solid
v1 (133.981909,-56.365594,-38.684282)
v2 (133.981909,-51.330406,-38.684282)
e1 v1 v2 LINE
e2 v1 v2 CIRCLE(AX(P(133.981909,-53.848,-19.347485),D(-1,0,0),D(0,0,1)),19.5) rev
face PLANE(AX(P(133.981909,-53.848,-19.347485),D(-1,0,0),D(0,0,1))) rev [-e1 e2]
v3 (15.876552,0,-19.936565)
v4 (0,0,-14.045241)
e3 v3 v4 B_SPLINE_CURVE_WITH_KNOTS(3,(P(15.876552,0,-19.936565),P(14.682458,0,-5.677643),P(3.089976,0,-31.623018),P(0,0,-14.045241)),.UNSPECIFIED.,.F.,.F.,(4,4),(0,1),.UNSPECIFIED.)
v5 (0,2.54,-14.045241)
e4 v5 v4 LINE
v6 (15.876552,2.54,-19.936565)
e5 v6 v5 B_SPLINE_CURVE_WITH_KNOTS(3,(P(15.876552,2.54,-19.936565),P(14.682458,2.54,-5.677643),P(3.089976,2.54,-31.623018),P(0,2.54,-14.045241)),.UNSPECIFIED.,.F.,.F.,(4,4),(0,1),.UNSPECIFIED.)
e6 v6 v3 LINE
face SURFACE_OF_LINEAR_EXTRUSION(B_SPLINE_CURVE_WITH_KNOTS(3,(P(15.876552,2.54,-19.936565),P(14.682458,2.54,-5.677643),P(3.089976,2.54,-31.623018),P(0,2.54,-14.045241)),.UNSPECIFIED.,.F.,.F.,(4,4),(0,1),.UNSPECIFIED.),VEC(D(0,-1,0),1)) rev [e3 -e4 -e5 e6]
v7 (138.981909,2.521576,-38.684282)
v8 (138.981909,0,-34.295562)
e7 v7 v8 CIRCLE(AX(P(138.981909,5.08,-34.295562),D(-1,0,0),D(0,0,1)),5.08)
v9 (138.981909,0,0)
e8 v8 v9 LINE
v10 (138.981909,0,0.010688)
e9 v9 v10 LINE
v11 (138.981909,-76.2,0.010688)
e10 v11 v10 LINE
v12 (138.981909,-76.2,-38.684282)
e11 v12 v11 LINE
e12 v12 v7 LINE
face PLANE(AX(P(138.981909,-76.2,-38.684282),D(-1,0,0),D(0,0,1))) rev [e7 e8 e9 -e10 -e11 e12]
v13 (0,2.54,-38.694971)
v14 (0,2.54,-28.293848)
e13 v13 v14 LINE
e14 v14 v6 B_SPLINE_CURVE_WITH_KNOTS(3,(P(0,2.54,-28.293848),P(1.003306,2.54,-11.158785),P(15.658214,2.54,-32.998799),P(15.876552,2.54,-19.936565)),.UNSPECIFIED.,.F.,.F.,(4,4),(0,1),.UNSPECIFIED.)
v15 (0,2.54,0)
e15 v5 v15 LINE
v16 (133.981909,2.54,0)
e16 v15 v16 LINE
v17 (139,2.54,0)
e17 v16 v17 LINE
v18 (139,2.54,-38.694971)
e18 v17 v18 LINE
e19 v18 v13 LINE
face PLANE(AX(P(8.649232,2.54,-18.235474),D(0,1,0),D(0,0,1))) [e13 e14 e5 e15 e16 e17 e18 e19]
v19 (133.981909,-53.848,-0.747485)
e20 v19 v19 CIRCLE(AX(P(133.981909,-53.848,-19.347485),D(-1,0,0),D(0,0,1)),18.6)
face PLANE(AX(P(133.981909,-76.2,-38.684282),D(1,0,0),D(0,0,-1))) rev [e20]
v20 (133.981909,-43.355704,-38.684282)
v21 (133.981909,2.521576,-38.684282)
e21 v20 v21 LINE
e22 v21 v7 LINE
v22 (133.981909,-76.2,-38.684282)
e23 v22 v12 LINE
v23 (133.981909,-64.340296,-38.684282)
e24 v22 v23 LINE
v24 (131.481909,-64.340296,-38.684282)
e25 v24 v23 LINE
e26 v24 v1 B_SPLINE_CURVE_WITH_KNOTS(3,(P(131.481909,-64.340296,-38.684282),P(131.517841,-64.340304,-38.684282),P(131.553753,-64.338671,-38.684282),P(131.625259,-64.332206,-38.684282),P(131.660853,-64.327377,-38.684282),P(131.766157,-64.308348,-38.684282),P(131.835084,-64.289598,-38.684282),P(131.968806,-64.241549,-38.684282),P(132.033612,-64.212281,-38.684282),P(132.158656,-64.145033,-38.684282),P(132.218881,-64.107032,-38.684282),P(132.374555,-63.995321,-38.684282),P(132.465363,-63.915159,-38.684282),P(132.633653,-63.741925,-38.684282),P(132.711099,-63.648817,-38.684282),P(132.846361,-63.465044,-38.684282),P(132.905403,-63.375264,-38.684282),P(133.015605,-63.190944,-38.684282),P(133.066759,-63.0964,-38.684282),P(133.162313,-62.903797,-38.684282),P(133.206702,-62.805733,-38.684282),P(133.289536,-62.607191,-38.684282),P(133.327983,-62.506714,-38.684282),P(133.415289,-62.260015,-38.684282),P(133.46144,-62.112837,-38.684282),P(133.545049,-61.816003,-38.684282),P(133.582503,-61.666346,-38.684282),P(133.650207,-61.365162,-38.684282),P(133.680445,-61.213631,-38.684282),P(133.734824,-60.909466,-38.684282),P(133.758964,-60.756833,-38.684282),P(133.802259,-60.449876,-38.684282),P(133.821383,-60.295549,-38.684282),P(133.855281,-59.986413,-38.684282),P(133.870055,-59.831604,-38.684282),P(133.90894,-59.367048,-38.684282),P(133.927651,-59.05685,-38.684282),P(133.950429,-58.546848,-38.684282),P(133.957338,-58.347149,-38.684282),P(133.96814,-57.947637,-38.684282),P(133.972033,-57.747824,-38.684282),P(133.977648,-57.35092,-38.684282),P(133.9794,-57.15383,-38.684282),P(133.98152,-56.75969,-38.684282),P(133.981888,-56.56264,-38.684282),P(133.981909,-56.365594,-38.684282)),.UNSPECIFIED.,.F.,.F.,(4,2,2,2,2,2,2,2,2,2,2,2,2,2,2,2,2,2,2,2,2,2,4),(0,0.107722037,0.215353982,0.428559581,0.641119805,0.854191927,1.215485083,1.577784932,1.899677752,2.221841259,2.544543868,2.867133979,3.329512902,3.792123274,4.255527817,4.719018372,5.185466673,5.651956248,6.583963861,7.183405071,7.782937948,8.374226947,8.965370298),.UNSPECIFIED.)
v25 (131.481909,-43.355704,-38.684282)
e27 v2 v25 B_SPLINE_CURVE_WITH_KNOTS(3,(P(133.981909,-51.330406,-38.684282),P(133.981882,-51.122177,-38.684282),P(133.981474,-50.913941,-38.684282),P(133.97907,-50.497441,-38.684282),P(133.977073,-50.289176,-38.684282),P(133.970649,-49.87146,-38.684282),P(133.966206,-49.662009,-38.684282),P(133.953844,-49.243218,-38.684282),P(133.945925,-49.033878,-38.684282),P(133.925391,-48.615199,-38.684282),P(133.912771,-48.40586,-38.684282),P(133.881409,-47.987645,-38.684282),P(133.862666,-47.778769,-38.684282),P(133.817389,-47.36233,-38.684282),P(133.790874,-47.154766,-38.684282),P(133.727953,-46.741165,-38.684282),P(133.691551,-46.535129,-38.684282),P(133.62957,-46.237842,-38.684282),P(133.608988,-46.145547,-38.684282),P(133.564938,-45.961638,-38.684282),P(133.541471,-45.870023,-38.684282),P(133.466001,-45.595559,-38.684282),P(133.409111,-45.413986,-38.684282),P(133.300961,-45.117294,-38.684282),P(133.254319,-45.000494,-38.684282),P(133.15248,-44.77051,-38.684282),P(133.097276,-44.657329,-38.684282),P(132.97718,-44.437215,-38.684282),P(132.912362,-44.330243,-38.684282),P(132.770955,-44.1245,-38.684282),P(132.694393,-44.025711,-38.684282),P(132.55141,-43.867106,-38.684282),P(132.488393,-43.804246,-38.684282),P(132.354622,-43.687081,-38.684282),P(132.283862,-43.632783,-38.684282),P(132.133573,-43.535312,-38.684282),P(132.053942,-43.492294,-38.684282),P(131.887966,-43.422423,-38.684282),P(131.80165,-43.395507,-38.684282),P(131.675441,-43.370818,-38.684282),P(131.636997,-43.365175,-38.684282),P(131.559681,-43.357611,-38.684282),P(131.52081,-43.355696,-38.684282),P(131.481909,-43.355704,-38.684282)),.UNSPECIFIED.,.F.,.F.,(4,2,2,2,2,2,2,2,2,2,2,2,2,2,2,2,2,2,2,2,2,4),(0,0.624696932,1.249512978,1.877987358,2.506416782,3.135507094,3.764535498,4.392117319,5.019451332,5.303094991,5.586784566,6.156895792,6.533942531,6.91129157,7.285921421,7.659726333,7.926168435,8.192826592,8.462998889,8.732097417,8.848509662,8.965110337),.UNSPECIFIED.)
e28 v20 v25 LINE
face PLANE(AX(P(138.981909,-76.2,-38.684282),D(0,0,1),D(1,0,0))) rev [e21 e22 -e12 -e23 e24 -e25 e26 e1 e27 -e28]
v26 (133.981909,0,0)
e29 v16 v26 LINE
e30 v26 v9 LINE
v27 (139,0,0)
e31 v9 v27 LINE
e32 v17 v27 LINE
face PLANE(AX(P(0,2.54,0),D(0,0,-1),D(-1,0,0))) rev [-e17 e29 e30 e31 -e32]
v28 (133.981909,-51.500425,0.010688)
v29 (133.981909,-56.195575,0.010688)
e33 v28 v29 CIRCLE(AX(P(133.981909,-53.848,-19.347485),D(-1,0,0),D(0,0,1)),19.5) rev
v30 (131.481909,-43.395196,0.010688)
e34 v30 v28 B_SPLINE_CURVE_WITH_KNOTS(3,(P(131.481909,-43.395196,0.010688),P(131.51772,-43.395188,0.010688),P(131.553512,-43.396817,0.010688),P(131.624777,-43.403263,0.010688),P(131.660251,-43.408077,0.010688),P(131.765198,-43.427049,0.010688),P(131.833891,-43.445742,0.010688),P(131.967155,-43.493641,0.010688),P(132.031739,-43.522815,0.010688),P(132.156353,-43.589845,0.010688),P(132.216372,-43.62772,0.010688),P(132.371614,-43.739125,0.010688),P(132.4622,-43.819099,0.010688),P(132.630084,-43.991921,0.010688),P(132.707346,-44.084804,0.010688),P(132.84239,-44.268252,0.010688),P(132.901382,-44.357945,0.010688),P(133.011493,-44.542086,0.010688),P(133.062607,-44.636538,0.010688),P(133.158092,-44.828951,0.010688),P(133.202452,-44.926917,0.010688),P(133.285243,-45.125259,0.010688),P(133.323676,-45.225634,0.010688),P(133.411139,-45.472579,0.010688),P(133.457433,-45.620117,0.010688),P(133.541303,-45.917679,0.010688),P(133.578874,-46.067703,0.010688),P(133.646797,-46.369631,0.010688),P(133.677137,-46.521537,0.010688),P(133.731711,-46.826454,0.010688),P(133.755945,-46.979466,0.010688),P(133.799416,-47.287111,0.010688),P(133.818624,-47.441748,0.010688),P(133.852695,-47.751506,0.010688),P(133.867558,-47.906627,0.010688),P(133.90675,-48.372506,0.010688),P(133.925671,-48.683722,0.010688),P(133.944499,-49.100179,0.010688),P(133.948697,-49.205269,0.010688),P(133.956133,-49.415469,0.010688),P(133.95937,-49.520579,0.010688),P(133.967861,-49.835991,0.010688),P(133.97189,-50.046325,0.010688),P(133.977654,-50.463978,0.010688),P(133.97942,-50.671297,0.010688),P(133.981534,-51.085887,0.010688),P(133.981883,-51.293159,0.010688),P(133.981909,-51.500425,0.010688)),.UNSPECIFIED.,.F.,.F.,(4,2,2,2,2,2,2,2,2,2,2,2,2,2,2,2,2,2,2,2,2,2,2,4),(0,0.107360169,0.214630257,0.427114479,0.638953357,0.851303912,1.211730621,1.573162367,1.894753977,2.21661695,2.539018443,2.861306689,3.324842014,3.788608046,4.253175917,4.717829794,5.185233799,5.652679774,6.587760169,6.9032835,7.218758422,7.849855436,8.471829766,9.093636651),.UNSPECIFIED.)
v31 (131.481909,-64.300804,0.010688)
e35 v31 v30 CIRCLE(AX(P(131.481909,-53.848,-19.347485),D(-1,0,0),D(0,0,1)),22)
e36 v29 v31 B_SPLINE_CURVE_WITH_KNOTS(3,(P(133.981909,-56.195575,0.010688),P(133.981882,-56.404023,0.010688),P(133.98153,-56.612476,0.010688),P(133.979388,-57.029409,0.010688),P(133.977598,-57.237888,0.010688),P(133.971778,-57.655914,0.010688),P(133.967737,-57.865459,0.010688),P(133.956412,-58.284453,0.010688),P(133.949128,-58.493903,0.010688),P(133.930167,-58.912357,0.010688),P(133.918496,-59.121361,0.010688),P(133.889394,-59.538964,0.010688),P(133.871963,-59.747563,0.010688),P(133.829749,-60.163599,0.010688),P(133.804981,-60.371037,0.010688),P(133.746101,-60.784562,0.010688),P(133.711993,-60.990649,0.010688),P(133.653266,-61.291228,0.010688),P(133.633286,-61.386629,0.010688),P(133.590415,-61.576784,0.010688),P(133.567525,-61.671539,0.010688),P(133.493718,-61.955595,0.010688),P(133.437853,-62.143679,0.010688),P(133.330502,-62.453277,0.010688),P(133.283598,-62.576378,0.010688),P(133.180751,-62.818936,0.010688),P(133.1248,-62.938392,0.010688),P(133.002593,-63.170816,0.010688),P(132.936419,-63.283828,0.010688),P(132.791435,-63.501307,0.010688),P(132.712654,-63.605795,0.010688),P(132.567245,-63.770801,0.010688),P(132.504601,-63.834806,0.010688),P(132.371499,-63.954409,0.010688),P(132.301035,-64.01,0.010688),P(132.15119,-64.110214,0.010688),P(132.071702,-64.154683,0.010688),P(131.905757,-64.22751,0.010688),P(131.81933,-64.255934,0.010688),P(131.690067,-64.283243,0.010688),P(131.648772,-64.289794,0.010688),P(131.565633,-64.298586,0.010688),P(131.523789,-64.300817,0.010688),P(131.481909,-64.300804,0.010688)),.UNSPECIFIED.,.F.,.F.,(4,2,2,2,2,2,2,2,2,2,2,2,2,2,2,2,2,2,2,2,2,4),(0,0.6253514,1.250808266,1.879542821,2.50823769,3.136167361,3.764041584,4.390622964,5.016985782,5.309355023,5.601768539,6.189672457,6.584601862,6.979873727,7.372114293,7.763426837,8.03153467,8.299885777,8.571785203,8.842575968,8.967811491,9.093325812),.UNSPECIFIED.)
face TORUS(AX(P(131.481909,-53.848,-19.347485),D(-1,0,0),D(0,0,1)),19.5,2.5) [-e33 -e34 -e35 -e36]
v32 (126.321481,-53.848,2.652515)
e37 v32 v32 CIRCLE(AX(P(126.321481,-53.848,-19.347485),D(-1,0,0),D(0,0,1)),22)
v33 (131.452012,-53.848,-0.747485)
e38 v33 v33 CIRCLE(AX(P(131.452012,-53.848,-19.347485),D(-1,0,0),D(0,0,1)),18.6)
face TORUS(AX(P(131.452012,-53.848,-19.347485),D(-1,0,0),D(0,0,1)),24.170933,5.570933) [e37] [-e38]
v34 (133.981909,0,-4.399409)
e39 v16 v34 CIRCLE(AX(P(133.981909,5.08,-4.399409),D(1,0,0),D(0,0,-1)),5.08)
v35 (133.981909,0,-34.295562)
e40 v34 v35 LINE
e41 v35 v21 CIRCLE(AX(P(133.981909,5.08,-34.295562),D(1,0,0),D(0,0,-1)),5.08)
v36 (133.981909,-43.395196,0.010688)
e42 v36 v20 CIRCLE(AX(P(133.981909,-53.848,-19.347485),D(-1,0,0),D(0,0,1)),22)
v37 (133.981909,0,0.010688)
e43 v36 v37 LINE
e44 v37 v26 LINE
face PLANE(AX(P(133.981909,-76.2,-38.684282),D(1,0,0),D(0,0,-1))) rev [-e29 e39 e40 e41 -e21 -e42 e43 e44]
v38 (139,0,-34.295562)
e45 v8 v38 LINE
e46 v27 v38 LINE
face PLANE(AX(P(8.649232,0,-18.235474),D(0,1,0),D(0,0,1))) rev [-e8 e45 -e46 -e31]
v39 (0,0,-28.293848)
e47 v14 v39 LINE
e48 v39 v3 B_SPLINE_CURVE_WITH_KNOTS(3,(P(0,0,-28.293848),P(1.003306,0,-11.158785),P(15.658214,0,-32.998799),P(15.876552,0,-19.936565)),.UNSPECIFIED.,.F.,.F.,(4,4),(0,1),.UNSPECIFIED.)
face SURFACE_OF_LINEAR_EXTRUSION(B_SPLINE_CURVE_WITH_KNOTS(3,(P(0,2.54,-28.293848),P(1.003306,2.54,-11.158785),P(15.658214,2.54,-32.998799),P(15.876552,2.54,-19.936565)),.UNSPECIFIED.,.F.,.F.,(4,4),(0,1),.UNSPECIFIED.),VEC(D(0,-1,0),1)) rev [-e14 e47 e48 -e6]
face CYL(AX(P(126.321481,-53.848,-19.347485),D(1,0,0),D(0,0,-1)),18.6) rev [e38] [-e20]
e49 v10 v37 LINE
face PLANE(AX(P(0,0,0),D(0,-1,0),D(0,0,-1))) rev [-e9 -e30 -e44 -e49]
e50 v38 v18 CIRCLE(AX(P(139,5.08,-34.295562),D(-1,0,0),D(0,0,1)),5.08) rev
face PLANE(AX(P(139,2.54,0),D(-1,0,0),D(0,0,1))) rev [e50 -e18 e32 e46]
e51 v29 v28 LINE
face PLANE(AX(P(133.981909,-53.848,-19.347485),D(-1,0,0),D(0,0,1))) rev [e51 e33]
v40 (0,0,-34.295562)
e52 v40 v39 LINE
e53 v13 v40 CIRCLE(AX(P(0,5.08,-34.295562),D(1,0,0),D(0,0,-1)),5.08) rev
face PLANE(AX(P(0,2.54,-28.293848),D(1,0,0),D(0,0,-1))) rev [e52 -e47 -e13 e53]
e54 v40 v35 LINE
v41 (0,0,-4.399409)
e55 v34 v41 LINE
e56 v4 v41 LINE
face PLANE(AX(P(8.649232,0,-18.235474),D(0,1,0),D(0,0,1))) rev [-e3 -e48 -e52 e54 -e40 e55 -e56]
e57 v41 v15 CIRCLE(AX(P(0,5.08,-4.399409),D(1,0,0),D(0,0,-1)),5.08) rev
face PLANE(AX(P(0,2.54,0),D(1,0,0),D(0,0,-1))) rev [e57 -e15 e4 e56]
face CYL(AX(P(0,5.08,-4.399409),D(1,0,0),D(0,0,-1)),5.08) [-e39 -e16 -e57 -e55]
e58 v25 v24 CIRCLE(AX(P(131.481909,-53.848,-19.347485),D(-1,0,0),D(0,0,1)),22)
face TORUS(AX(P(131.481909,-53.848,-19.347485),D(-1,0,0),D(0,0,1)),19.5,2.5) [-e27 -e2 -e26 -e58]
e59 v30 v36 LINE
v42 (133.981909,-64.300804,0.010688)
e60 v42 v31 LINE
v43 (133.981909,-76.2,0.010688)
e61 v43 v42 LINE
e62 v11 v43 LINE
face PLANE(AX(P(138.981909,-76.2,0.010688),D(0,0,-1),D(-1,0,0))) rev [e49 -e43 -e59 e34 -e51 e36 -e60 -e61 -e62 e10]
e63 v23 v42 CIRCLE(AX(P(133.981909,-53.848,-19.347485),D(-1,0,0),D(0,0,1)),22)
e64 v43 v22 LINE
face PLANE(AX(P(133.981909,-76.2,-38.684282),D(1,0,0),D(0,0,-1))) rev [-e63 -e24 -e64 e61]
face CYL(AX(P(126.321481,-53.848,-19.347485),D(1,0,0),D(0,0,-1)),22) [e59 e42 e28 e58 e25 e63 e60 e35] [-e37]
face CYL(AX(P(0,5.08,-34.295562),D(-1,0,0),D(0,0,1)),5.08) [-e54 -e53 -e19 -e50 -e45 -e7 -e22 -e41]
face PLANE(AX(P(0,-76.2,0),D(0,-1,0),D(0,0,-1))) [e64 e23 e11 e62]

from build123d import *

# Parameters (mm, degrees)
BOSS_EXTRUDE1_DEPTH = 2.54
BOSS_EXTRUDE2_DEPTH = 76.2
SKETCH6_R           = 22
SKETCH6_R_2         = 18.600000000000005
BOSS_EXTRUDE5_DEPTH = 7.660427645478581
FILLET10_R          = 2.5
FILLET11_R          = 2.5
FILLET13_R          = 5.57093307
FILLET15_R          = 5.08
FILLET16_R          = 5.08


with BuildPart() as part:
    # Sketch1 → Boss-Extrude1 (new body)
    with BuildSketch(Plane(origin=(0, 0, 0), x_dir=(1, 0, 0), z_dir=(0, 1, 0))):
        with BuildLine():
            Line((0, 28.293848376378605), (0, 38.694970839027235))
            Line((0, 38.694970839027235), (139, 38.694970839027235))
            Line((139, 38.694970839027235), (139, 0))
            Line((139, 0), (0, 0))
            Line((0, 0), (0, 14.045240588338004))
            add(Edge.make_bspline(
                [(0, 14.045240588338004), (3.0899762489281395, 31.623018189199616), (14.68245796656543, 5.677642965238619), (15.876552294634884, 19.936564793057386)],
                knots=[0, 0, 0, 0, 1, 1, 1, 1], degree=3))
            add(Edge.make_bspline(
                [(0, 28.293848376378605), (1.0033062764081593, 11.15878467888299), (15.658213538640268, 32.998799430672), (15.876552294634884, 19.936564793057386)],
                knots=[0, 0, 0, 0, 1, 1, 1, 1], degree=3))
        make_face()
    extrude(amount=BOSS_EXTRUDE1_DEPTH)

    # Sketch5 → Boss-Extrude2 (add)
    with BuildSketch(Plane.XZ):
        Polygon((138.98190867121684, -38.68428246542061), (133.98190867121684, -38.68428246542061), (133.98190867121684, 0.01068837360662839), (138.98190867121684, 0.010688373606629), align=None)
    extrude(amount=BOSS_EXTRUDE2_DEPTH)

    # Sketch6 → Boss-Extrude5 (add)
    with BuildSketch(Plane.ZY.offset(-133.98190867121684)):
        with Locations(Location((-19.347485419513617, -53.847999999999985, 0), (0, 0, 151.515398593))):
            Circle(SKETCH6_R)
        with Locations((-19.347485419513617, -53.847999999999985)):
            Circle(SKETCH6_R_2, mode=Mode.SUBTRACT)
    extrude(amount=BOSS_EXTRUDE5_DEPTH)

    # Fillet10
    # the kernel refuses this fillet: 2.5 mm, written as the material it takes off along each edge
    with BuildSketch(Plane(origin=(133.98190867121684, -53.847999999999985, -19.347485419513617), x_dir=(0, 0.7041935749471109, -0.7100080344638416), z_dir=(0, 0.7100080344638416, 0.7041935749471109))) as fillet10_piece_1_section:
        with BuildLine():
            CenterArc((22 - FILLET10_R, FILLET10_R), FILLET10_R, 269.9999999999999, 90.00000000000011)
            Line((22 - FILLET10_R, 0), (22, 0))
            Line((22, 0), (22, FILLET10_R))
        make_face()
    fillet10_piece_1 = revolve(axis=Axis((133.98190867121684, -53.847999999999985, -19.347485419513617), (-1, 0, 0)), revolution_arc=89.52886192357941, mode=Mode.PRIVATE)
    fillet10_piece_1 = split(fillet10_piece_1, bisect_by=Plane(origin=(133.27050053527873, -53.847999999999985, -38.68428246542061), z_dir=(0, 0, -1)), keep=Keep.TOP, mode=Mode.PRIVATE)
    add(fillet10_piece_1, mode=Mode.SUBTRACT)

    # Fillet11
    fillet11_edges = [part.edges().sort_by_distance(p)[0] for p in [
        (133.98190867121684, -53.84800000000051, 2.6525145804863826),
    ]]
    fillet(fillet11_edges, radius=FILLET11_R)

    # Fillet13
    # the kernel refuses this fillet: 5.57093307 mm, written as the material it takes off along each edge
    with BuildSketch(Plane(origin=(126.32148102573827, -53.847999999999985, -19.347485419513617), x_dir=(0, 0, 1), z_dir=(0, -1, 0))) as fillet13_piece_1:
        with BuildLine():
            CenterArc((24.170933070445475, -5.130530662517188), FILLET13_R, 112.93516881526322, 67.06483118473678)
            Line((18.600000000000005, -5.130530662517188), (18.488581338591096, -5.130530662517188))
            Line((18.488581338591096, -5.130530662517188), (18.488581338591096, 0))
            Line((18.488581338591096, 0), (18.600000000000005, 0.111418661408905))
            ThreePointArc((18.600000000000005, 0.111418661408905), (20.3, 0.111418661408905), (21.956581338591086, 0.1026106132503628))
            Line((21.956581338591086, 0.1026106132503628), (21.999999999999996, 1.421e-14))
        make_face()
    revolve(axis=Axis((126.32148102573827, -53.847999999999985, -19.347485419513617), (-1, 0, 0)), mode=Mode.SUBTRACT)

    # Fillet15
    # the kernel refuses this fillet: 5.08 mm, written as the material it takes off along each edge
    with BuildSketch(Plane(origin=(-10.998522628063, 0, -38.694970839027235), x_dir=(0, 0, 1), z_dir=(1, 0, 0))) as fillet15_piece_1_section:
        with BuildLine():
            CenterArc((4.3994090512251915, -5.079999999999999), FILLET15_R, 90, 60.00000000000139)
            Line((1.8474e-13, -2.5400000000001057), (0, 0))
            Line((0, 0), (4.3994090512251915, 0))
        make_face()
    fillet15_piece_1 = extrude(amount=160.997045256126, mode=Mode.PRIVATE)
    fillet15_piece_1 = split(fillet15_piece_1, bisect_by=Plane(origin=(133.98190867121684, 0.6664663042665507, -36.831394815078376), z_dir=(-1, 0, 0)), keep=Keep.TOP, mode=Mode.PRIVATE)
    add(fillet15_piece_1, mode=Mode.SUBTRACT)
    with BuildSketch(Plane(origin=(-10.998522628063, 0, -38.694970839027235), x_dir=(0, 0, 1), z_dir=(1, 0, 0))) as fillet15_piece_2_section:
        with BuildLine():
            CenterArc((4.3994090512251915, -5.079999999999999), FILLET15_R, 90, 60.00000000000139)
            Line((1.8474e-13, -2.5400000000001057), (0, 0))
            Line((0, 0), (4.3994090512251915, 0))
        make_face()
    fillet15_piece_2 = extrude(amount=160.997045256126, mode=Mode.PRIVATE)
    fillet15_piece_2 = split(fillet15_piece_2, bisect_by=Plane(origin=(136.48190867121684, 2.530272803909126, -38.68428246542061), z_dir=(0, 0, -1)), keep=Keep.TOP, mode=Mode.PRIVATE)
    add(fillet15_piece_2, mode=Mode.SUBTRACT)
    with BuildSketch(Plane(origin=(-10.998522628063, 0, -38.694970839027235), x_dir=(0, 0, 1), z_dir=(1, 0, 0))) as fillet15_piece_3_section:
        with BuildLine():
            CenterArc((4.3994090512251915, -5.079999999999999), FILLET15_R, 90, 60.00000000000139)
            Line((1.8474e-13, -2.5400000000001057), (0, 0))
            Line((0, 0), (4.3994090512251915, 0))
        make_face()
    fillet15_piece_3 = extrude(amount=160.997045256126, mode=Mode.PRIVATE)
    fillet15_piece_3 = split(fillet15_piece_3, bisect_by=Plane(origin=(138.98190867121684, 0.6664663042665507, -36.831394815078376), z_dir=(1, 0, 0)), keep=Keep.TOP, mode=Mode.PRIVATE)
    add(fillet15_piece_3, mode=Mode.SUBTRACT)

    # Fillet16
    # the kernel refuses this fillet: 5.08 mm, written as the material it takes off along each edge
    with BuildSketch(Plane(origin=(133.98190867121684, 0, 0), x_dir=(0, 0, -1), z_dir=(-1, 0, 0))) as fillet16_piece_1:
        with BuildLine():
            CenterArc((4.399409051225193, -5.079999999999999), FILLET16_R, 90, 60.00000000000139)
            Line((1.8474e-13, -2.5400000000001066), (0, 0))
            Line((0, 0), (4.399409051225193, 0))
        make_face()
    extrude(amount=144.98043129927981, mode=Mode.SUBTRACT)


solid = part.part
